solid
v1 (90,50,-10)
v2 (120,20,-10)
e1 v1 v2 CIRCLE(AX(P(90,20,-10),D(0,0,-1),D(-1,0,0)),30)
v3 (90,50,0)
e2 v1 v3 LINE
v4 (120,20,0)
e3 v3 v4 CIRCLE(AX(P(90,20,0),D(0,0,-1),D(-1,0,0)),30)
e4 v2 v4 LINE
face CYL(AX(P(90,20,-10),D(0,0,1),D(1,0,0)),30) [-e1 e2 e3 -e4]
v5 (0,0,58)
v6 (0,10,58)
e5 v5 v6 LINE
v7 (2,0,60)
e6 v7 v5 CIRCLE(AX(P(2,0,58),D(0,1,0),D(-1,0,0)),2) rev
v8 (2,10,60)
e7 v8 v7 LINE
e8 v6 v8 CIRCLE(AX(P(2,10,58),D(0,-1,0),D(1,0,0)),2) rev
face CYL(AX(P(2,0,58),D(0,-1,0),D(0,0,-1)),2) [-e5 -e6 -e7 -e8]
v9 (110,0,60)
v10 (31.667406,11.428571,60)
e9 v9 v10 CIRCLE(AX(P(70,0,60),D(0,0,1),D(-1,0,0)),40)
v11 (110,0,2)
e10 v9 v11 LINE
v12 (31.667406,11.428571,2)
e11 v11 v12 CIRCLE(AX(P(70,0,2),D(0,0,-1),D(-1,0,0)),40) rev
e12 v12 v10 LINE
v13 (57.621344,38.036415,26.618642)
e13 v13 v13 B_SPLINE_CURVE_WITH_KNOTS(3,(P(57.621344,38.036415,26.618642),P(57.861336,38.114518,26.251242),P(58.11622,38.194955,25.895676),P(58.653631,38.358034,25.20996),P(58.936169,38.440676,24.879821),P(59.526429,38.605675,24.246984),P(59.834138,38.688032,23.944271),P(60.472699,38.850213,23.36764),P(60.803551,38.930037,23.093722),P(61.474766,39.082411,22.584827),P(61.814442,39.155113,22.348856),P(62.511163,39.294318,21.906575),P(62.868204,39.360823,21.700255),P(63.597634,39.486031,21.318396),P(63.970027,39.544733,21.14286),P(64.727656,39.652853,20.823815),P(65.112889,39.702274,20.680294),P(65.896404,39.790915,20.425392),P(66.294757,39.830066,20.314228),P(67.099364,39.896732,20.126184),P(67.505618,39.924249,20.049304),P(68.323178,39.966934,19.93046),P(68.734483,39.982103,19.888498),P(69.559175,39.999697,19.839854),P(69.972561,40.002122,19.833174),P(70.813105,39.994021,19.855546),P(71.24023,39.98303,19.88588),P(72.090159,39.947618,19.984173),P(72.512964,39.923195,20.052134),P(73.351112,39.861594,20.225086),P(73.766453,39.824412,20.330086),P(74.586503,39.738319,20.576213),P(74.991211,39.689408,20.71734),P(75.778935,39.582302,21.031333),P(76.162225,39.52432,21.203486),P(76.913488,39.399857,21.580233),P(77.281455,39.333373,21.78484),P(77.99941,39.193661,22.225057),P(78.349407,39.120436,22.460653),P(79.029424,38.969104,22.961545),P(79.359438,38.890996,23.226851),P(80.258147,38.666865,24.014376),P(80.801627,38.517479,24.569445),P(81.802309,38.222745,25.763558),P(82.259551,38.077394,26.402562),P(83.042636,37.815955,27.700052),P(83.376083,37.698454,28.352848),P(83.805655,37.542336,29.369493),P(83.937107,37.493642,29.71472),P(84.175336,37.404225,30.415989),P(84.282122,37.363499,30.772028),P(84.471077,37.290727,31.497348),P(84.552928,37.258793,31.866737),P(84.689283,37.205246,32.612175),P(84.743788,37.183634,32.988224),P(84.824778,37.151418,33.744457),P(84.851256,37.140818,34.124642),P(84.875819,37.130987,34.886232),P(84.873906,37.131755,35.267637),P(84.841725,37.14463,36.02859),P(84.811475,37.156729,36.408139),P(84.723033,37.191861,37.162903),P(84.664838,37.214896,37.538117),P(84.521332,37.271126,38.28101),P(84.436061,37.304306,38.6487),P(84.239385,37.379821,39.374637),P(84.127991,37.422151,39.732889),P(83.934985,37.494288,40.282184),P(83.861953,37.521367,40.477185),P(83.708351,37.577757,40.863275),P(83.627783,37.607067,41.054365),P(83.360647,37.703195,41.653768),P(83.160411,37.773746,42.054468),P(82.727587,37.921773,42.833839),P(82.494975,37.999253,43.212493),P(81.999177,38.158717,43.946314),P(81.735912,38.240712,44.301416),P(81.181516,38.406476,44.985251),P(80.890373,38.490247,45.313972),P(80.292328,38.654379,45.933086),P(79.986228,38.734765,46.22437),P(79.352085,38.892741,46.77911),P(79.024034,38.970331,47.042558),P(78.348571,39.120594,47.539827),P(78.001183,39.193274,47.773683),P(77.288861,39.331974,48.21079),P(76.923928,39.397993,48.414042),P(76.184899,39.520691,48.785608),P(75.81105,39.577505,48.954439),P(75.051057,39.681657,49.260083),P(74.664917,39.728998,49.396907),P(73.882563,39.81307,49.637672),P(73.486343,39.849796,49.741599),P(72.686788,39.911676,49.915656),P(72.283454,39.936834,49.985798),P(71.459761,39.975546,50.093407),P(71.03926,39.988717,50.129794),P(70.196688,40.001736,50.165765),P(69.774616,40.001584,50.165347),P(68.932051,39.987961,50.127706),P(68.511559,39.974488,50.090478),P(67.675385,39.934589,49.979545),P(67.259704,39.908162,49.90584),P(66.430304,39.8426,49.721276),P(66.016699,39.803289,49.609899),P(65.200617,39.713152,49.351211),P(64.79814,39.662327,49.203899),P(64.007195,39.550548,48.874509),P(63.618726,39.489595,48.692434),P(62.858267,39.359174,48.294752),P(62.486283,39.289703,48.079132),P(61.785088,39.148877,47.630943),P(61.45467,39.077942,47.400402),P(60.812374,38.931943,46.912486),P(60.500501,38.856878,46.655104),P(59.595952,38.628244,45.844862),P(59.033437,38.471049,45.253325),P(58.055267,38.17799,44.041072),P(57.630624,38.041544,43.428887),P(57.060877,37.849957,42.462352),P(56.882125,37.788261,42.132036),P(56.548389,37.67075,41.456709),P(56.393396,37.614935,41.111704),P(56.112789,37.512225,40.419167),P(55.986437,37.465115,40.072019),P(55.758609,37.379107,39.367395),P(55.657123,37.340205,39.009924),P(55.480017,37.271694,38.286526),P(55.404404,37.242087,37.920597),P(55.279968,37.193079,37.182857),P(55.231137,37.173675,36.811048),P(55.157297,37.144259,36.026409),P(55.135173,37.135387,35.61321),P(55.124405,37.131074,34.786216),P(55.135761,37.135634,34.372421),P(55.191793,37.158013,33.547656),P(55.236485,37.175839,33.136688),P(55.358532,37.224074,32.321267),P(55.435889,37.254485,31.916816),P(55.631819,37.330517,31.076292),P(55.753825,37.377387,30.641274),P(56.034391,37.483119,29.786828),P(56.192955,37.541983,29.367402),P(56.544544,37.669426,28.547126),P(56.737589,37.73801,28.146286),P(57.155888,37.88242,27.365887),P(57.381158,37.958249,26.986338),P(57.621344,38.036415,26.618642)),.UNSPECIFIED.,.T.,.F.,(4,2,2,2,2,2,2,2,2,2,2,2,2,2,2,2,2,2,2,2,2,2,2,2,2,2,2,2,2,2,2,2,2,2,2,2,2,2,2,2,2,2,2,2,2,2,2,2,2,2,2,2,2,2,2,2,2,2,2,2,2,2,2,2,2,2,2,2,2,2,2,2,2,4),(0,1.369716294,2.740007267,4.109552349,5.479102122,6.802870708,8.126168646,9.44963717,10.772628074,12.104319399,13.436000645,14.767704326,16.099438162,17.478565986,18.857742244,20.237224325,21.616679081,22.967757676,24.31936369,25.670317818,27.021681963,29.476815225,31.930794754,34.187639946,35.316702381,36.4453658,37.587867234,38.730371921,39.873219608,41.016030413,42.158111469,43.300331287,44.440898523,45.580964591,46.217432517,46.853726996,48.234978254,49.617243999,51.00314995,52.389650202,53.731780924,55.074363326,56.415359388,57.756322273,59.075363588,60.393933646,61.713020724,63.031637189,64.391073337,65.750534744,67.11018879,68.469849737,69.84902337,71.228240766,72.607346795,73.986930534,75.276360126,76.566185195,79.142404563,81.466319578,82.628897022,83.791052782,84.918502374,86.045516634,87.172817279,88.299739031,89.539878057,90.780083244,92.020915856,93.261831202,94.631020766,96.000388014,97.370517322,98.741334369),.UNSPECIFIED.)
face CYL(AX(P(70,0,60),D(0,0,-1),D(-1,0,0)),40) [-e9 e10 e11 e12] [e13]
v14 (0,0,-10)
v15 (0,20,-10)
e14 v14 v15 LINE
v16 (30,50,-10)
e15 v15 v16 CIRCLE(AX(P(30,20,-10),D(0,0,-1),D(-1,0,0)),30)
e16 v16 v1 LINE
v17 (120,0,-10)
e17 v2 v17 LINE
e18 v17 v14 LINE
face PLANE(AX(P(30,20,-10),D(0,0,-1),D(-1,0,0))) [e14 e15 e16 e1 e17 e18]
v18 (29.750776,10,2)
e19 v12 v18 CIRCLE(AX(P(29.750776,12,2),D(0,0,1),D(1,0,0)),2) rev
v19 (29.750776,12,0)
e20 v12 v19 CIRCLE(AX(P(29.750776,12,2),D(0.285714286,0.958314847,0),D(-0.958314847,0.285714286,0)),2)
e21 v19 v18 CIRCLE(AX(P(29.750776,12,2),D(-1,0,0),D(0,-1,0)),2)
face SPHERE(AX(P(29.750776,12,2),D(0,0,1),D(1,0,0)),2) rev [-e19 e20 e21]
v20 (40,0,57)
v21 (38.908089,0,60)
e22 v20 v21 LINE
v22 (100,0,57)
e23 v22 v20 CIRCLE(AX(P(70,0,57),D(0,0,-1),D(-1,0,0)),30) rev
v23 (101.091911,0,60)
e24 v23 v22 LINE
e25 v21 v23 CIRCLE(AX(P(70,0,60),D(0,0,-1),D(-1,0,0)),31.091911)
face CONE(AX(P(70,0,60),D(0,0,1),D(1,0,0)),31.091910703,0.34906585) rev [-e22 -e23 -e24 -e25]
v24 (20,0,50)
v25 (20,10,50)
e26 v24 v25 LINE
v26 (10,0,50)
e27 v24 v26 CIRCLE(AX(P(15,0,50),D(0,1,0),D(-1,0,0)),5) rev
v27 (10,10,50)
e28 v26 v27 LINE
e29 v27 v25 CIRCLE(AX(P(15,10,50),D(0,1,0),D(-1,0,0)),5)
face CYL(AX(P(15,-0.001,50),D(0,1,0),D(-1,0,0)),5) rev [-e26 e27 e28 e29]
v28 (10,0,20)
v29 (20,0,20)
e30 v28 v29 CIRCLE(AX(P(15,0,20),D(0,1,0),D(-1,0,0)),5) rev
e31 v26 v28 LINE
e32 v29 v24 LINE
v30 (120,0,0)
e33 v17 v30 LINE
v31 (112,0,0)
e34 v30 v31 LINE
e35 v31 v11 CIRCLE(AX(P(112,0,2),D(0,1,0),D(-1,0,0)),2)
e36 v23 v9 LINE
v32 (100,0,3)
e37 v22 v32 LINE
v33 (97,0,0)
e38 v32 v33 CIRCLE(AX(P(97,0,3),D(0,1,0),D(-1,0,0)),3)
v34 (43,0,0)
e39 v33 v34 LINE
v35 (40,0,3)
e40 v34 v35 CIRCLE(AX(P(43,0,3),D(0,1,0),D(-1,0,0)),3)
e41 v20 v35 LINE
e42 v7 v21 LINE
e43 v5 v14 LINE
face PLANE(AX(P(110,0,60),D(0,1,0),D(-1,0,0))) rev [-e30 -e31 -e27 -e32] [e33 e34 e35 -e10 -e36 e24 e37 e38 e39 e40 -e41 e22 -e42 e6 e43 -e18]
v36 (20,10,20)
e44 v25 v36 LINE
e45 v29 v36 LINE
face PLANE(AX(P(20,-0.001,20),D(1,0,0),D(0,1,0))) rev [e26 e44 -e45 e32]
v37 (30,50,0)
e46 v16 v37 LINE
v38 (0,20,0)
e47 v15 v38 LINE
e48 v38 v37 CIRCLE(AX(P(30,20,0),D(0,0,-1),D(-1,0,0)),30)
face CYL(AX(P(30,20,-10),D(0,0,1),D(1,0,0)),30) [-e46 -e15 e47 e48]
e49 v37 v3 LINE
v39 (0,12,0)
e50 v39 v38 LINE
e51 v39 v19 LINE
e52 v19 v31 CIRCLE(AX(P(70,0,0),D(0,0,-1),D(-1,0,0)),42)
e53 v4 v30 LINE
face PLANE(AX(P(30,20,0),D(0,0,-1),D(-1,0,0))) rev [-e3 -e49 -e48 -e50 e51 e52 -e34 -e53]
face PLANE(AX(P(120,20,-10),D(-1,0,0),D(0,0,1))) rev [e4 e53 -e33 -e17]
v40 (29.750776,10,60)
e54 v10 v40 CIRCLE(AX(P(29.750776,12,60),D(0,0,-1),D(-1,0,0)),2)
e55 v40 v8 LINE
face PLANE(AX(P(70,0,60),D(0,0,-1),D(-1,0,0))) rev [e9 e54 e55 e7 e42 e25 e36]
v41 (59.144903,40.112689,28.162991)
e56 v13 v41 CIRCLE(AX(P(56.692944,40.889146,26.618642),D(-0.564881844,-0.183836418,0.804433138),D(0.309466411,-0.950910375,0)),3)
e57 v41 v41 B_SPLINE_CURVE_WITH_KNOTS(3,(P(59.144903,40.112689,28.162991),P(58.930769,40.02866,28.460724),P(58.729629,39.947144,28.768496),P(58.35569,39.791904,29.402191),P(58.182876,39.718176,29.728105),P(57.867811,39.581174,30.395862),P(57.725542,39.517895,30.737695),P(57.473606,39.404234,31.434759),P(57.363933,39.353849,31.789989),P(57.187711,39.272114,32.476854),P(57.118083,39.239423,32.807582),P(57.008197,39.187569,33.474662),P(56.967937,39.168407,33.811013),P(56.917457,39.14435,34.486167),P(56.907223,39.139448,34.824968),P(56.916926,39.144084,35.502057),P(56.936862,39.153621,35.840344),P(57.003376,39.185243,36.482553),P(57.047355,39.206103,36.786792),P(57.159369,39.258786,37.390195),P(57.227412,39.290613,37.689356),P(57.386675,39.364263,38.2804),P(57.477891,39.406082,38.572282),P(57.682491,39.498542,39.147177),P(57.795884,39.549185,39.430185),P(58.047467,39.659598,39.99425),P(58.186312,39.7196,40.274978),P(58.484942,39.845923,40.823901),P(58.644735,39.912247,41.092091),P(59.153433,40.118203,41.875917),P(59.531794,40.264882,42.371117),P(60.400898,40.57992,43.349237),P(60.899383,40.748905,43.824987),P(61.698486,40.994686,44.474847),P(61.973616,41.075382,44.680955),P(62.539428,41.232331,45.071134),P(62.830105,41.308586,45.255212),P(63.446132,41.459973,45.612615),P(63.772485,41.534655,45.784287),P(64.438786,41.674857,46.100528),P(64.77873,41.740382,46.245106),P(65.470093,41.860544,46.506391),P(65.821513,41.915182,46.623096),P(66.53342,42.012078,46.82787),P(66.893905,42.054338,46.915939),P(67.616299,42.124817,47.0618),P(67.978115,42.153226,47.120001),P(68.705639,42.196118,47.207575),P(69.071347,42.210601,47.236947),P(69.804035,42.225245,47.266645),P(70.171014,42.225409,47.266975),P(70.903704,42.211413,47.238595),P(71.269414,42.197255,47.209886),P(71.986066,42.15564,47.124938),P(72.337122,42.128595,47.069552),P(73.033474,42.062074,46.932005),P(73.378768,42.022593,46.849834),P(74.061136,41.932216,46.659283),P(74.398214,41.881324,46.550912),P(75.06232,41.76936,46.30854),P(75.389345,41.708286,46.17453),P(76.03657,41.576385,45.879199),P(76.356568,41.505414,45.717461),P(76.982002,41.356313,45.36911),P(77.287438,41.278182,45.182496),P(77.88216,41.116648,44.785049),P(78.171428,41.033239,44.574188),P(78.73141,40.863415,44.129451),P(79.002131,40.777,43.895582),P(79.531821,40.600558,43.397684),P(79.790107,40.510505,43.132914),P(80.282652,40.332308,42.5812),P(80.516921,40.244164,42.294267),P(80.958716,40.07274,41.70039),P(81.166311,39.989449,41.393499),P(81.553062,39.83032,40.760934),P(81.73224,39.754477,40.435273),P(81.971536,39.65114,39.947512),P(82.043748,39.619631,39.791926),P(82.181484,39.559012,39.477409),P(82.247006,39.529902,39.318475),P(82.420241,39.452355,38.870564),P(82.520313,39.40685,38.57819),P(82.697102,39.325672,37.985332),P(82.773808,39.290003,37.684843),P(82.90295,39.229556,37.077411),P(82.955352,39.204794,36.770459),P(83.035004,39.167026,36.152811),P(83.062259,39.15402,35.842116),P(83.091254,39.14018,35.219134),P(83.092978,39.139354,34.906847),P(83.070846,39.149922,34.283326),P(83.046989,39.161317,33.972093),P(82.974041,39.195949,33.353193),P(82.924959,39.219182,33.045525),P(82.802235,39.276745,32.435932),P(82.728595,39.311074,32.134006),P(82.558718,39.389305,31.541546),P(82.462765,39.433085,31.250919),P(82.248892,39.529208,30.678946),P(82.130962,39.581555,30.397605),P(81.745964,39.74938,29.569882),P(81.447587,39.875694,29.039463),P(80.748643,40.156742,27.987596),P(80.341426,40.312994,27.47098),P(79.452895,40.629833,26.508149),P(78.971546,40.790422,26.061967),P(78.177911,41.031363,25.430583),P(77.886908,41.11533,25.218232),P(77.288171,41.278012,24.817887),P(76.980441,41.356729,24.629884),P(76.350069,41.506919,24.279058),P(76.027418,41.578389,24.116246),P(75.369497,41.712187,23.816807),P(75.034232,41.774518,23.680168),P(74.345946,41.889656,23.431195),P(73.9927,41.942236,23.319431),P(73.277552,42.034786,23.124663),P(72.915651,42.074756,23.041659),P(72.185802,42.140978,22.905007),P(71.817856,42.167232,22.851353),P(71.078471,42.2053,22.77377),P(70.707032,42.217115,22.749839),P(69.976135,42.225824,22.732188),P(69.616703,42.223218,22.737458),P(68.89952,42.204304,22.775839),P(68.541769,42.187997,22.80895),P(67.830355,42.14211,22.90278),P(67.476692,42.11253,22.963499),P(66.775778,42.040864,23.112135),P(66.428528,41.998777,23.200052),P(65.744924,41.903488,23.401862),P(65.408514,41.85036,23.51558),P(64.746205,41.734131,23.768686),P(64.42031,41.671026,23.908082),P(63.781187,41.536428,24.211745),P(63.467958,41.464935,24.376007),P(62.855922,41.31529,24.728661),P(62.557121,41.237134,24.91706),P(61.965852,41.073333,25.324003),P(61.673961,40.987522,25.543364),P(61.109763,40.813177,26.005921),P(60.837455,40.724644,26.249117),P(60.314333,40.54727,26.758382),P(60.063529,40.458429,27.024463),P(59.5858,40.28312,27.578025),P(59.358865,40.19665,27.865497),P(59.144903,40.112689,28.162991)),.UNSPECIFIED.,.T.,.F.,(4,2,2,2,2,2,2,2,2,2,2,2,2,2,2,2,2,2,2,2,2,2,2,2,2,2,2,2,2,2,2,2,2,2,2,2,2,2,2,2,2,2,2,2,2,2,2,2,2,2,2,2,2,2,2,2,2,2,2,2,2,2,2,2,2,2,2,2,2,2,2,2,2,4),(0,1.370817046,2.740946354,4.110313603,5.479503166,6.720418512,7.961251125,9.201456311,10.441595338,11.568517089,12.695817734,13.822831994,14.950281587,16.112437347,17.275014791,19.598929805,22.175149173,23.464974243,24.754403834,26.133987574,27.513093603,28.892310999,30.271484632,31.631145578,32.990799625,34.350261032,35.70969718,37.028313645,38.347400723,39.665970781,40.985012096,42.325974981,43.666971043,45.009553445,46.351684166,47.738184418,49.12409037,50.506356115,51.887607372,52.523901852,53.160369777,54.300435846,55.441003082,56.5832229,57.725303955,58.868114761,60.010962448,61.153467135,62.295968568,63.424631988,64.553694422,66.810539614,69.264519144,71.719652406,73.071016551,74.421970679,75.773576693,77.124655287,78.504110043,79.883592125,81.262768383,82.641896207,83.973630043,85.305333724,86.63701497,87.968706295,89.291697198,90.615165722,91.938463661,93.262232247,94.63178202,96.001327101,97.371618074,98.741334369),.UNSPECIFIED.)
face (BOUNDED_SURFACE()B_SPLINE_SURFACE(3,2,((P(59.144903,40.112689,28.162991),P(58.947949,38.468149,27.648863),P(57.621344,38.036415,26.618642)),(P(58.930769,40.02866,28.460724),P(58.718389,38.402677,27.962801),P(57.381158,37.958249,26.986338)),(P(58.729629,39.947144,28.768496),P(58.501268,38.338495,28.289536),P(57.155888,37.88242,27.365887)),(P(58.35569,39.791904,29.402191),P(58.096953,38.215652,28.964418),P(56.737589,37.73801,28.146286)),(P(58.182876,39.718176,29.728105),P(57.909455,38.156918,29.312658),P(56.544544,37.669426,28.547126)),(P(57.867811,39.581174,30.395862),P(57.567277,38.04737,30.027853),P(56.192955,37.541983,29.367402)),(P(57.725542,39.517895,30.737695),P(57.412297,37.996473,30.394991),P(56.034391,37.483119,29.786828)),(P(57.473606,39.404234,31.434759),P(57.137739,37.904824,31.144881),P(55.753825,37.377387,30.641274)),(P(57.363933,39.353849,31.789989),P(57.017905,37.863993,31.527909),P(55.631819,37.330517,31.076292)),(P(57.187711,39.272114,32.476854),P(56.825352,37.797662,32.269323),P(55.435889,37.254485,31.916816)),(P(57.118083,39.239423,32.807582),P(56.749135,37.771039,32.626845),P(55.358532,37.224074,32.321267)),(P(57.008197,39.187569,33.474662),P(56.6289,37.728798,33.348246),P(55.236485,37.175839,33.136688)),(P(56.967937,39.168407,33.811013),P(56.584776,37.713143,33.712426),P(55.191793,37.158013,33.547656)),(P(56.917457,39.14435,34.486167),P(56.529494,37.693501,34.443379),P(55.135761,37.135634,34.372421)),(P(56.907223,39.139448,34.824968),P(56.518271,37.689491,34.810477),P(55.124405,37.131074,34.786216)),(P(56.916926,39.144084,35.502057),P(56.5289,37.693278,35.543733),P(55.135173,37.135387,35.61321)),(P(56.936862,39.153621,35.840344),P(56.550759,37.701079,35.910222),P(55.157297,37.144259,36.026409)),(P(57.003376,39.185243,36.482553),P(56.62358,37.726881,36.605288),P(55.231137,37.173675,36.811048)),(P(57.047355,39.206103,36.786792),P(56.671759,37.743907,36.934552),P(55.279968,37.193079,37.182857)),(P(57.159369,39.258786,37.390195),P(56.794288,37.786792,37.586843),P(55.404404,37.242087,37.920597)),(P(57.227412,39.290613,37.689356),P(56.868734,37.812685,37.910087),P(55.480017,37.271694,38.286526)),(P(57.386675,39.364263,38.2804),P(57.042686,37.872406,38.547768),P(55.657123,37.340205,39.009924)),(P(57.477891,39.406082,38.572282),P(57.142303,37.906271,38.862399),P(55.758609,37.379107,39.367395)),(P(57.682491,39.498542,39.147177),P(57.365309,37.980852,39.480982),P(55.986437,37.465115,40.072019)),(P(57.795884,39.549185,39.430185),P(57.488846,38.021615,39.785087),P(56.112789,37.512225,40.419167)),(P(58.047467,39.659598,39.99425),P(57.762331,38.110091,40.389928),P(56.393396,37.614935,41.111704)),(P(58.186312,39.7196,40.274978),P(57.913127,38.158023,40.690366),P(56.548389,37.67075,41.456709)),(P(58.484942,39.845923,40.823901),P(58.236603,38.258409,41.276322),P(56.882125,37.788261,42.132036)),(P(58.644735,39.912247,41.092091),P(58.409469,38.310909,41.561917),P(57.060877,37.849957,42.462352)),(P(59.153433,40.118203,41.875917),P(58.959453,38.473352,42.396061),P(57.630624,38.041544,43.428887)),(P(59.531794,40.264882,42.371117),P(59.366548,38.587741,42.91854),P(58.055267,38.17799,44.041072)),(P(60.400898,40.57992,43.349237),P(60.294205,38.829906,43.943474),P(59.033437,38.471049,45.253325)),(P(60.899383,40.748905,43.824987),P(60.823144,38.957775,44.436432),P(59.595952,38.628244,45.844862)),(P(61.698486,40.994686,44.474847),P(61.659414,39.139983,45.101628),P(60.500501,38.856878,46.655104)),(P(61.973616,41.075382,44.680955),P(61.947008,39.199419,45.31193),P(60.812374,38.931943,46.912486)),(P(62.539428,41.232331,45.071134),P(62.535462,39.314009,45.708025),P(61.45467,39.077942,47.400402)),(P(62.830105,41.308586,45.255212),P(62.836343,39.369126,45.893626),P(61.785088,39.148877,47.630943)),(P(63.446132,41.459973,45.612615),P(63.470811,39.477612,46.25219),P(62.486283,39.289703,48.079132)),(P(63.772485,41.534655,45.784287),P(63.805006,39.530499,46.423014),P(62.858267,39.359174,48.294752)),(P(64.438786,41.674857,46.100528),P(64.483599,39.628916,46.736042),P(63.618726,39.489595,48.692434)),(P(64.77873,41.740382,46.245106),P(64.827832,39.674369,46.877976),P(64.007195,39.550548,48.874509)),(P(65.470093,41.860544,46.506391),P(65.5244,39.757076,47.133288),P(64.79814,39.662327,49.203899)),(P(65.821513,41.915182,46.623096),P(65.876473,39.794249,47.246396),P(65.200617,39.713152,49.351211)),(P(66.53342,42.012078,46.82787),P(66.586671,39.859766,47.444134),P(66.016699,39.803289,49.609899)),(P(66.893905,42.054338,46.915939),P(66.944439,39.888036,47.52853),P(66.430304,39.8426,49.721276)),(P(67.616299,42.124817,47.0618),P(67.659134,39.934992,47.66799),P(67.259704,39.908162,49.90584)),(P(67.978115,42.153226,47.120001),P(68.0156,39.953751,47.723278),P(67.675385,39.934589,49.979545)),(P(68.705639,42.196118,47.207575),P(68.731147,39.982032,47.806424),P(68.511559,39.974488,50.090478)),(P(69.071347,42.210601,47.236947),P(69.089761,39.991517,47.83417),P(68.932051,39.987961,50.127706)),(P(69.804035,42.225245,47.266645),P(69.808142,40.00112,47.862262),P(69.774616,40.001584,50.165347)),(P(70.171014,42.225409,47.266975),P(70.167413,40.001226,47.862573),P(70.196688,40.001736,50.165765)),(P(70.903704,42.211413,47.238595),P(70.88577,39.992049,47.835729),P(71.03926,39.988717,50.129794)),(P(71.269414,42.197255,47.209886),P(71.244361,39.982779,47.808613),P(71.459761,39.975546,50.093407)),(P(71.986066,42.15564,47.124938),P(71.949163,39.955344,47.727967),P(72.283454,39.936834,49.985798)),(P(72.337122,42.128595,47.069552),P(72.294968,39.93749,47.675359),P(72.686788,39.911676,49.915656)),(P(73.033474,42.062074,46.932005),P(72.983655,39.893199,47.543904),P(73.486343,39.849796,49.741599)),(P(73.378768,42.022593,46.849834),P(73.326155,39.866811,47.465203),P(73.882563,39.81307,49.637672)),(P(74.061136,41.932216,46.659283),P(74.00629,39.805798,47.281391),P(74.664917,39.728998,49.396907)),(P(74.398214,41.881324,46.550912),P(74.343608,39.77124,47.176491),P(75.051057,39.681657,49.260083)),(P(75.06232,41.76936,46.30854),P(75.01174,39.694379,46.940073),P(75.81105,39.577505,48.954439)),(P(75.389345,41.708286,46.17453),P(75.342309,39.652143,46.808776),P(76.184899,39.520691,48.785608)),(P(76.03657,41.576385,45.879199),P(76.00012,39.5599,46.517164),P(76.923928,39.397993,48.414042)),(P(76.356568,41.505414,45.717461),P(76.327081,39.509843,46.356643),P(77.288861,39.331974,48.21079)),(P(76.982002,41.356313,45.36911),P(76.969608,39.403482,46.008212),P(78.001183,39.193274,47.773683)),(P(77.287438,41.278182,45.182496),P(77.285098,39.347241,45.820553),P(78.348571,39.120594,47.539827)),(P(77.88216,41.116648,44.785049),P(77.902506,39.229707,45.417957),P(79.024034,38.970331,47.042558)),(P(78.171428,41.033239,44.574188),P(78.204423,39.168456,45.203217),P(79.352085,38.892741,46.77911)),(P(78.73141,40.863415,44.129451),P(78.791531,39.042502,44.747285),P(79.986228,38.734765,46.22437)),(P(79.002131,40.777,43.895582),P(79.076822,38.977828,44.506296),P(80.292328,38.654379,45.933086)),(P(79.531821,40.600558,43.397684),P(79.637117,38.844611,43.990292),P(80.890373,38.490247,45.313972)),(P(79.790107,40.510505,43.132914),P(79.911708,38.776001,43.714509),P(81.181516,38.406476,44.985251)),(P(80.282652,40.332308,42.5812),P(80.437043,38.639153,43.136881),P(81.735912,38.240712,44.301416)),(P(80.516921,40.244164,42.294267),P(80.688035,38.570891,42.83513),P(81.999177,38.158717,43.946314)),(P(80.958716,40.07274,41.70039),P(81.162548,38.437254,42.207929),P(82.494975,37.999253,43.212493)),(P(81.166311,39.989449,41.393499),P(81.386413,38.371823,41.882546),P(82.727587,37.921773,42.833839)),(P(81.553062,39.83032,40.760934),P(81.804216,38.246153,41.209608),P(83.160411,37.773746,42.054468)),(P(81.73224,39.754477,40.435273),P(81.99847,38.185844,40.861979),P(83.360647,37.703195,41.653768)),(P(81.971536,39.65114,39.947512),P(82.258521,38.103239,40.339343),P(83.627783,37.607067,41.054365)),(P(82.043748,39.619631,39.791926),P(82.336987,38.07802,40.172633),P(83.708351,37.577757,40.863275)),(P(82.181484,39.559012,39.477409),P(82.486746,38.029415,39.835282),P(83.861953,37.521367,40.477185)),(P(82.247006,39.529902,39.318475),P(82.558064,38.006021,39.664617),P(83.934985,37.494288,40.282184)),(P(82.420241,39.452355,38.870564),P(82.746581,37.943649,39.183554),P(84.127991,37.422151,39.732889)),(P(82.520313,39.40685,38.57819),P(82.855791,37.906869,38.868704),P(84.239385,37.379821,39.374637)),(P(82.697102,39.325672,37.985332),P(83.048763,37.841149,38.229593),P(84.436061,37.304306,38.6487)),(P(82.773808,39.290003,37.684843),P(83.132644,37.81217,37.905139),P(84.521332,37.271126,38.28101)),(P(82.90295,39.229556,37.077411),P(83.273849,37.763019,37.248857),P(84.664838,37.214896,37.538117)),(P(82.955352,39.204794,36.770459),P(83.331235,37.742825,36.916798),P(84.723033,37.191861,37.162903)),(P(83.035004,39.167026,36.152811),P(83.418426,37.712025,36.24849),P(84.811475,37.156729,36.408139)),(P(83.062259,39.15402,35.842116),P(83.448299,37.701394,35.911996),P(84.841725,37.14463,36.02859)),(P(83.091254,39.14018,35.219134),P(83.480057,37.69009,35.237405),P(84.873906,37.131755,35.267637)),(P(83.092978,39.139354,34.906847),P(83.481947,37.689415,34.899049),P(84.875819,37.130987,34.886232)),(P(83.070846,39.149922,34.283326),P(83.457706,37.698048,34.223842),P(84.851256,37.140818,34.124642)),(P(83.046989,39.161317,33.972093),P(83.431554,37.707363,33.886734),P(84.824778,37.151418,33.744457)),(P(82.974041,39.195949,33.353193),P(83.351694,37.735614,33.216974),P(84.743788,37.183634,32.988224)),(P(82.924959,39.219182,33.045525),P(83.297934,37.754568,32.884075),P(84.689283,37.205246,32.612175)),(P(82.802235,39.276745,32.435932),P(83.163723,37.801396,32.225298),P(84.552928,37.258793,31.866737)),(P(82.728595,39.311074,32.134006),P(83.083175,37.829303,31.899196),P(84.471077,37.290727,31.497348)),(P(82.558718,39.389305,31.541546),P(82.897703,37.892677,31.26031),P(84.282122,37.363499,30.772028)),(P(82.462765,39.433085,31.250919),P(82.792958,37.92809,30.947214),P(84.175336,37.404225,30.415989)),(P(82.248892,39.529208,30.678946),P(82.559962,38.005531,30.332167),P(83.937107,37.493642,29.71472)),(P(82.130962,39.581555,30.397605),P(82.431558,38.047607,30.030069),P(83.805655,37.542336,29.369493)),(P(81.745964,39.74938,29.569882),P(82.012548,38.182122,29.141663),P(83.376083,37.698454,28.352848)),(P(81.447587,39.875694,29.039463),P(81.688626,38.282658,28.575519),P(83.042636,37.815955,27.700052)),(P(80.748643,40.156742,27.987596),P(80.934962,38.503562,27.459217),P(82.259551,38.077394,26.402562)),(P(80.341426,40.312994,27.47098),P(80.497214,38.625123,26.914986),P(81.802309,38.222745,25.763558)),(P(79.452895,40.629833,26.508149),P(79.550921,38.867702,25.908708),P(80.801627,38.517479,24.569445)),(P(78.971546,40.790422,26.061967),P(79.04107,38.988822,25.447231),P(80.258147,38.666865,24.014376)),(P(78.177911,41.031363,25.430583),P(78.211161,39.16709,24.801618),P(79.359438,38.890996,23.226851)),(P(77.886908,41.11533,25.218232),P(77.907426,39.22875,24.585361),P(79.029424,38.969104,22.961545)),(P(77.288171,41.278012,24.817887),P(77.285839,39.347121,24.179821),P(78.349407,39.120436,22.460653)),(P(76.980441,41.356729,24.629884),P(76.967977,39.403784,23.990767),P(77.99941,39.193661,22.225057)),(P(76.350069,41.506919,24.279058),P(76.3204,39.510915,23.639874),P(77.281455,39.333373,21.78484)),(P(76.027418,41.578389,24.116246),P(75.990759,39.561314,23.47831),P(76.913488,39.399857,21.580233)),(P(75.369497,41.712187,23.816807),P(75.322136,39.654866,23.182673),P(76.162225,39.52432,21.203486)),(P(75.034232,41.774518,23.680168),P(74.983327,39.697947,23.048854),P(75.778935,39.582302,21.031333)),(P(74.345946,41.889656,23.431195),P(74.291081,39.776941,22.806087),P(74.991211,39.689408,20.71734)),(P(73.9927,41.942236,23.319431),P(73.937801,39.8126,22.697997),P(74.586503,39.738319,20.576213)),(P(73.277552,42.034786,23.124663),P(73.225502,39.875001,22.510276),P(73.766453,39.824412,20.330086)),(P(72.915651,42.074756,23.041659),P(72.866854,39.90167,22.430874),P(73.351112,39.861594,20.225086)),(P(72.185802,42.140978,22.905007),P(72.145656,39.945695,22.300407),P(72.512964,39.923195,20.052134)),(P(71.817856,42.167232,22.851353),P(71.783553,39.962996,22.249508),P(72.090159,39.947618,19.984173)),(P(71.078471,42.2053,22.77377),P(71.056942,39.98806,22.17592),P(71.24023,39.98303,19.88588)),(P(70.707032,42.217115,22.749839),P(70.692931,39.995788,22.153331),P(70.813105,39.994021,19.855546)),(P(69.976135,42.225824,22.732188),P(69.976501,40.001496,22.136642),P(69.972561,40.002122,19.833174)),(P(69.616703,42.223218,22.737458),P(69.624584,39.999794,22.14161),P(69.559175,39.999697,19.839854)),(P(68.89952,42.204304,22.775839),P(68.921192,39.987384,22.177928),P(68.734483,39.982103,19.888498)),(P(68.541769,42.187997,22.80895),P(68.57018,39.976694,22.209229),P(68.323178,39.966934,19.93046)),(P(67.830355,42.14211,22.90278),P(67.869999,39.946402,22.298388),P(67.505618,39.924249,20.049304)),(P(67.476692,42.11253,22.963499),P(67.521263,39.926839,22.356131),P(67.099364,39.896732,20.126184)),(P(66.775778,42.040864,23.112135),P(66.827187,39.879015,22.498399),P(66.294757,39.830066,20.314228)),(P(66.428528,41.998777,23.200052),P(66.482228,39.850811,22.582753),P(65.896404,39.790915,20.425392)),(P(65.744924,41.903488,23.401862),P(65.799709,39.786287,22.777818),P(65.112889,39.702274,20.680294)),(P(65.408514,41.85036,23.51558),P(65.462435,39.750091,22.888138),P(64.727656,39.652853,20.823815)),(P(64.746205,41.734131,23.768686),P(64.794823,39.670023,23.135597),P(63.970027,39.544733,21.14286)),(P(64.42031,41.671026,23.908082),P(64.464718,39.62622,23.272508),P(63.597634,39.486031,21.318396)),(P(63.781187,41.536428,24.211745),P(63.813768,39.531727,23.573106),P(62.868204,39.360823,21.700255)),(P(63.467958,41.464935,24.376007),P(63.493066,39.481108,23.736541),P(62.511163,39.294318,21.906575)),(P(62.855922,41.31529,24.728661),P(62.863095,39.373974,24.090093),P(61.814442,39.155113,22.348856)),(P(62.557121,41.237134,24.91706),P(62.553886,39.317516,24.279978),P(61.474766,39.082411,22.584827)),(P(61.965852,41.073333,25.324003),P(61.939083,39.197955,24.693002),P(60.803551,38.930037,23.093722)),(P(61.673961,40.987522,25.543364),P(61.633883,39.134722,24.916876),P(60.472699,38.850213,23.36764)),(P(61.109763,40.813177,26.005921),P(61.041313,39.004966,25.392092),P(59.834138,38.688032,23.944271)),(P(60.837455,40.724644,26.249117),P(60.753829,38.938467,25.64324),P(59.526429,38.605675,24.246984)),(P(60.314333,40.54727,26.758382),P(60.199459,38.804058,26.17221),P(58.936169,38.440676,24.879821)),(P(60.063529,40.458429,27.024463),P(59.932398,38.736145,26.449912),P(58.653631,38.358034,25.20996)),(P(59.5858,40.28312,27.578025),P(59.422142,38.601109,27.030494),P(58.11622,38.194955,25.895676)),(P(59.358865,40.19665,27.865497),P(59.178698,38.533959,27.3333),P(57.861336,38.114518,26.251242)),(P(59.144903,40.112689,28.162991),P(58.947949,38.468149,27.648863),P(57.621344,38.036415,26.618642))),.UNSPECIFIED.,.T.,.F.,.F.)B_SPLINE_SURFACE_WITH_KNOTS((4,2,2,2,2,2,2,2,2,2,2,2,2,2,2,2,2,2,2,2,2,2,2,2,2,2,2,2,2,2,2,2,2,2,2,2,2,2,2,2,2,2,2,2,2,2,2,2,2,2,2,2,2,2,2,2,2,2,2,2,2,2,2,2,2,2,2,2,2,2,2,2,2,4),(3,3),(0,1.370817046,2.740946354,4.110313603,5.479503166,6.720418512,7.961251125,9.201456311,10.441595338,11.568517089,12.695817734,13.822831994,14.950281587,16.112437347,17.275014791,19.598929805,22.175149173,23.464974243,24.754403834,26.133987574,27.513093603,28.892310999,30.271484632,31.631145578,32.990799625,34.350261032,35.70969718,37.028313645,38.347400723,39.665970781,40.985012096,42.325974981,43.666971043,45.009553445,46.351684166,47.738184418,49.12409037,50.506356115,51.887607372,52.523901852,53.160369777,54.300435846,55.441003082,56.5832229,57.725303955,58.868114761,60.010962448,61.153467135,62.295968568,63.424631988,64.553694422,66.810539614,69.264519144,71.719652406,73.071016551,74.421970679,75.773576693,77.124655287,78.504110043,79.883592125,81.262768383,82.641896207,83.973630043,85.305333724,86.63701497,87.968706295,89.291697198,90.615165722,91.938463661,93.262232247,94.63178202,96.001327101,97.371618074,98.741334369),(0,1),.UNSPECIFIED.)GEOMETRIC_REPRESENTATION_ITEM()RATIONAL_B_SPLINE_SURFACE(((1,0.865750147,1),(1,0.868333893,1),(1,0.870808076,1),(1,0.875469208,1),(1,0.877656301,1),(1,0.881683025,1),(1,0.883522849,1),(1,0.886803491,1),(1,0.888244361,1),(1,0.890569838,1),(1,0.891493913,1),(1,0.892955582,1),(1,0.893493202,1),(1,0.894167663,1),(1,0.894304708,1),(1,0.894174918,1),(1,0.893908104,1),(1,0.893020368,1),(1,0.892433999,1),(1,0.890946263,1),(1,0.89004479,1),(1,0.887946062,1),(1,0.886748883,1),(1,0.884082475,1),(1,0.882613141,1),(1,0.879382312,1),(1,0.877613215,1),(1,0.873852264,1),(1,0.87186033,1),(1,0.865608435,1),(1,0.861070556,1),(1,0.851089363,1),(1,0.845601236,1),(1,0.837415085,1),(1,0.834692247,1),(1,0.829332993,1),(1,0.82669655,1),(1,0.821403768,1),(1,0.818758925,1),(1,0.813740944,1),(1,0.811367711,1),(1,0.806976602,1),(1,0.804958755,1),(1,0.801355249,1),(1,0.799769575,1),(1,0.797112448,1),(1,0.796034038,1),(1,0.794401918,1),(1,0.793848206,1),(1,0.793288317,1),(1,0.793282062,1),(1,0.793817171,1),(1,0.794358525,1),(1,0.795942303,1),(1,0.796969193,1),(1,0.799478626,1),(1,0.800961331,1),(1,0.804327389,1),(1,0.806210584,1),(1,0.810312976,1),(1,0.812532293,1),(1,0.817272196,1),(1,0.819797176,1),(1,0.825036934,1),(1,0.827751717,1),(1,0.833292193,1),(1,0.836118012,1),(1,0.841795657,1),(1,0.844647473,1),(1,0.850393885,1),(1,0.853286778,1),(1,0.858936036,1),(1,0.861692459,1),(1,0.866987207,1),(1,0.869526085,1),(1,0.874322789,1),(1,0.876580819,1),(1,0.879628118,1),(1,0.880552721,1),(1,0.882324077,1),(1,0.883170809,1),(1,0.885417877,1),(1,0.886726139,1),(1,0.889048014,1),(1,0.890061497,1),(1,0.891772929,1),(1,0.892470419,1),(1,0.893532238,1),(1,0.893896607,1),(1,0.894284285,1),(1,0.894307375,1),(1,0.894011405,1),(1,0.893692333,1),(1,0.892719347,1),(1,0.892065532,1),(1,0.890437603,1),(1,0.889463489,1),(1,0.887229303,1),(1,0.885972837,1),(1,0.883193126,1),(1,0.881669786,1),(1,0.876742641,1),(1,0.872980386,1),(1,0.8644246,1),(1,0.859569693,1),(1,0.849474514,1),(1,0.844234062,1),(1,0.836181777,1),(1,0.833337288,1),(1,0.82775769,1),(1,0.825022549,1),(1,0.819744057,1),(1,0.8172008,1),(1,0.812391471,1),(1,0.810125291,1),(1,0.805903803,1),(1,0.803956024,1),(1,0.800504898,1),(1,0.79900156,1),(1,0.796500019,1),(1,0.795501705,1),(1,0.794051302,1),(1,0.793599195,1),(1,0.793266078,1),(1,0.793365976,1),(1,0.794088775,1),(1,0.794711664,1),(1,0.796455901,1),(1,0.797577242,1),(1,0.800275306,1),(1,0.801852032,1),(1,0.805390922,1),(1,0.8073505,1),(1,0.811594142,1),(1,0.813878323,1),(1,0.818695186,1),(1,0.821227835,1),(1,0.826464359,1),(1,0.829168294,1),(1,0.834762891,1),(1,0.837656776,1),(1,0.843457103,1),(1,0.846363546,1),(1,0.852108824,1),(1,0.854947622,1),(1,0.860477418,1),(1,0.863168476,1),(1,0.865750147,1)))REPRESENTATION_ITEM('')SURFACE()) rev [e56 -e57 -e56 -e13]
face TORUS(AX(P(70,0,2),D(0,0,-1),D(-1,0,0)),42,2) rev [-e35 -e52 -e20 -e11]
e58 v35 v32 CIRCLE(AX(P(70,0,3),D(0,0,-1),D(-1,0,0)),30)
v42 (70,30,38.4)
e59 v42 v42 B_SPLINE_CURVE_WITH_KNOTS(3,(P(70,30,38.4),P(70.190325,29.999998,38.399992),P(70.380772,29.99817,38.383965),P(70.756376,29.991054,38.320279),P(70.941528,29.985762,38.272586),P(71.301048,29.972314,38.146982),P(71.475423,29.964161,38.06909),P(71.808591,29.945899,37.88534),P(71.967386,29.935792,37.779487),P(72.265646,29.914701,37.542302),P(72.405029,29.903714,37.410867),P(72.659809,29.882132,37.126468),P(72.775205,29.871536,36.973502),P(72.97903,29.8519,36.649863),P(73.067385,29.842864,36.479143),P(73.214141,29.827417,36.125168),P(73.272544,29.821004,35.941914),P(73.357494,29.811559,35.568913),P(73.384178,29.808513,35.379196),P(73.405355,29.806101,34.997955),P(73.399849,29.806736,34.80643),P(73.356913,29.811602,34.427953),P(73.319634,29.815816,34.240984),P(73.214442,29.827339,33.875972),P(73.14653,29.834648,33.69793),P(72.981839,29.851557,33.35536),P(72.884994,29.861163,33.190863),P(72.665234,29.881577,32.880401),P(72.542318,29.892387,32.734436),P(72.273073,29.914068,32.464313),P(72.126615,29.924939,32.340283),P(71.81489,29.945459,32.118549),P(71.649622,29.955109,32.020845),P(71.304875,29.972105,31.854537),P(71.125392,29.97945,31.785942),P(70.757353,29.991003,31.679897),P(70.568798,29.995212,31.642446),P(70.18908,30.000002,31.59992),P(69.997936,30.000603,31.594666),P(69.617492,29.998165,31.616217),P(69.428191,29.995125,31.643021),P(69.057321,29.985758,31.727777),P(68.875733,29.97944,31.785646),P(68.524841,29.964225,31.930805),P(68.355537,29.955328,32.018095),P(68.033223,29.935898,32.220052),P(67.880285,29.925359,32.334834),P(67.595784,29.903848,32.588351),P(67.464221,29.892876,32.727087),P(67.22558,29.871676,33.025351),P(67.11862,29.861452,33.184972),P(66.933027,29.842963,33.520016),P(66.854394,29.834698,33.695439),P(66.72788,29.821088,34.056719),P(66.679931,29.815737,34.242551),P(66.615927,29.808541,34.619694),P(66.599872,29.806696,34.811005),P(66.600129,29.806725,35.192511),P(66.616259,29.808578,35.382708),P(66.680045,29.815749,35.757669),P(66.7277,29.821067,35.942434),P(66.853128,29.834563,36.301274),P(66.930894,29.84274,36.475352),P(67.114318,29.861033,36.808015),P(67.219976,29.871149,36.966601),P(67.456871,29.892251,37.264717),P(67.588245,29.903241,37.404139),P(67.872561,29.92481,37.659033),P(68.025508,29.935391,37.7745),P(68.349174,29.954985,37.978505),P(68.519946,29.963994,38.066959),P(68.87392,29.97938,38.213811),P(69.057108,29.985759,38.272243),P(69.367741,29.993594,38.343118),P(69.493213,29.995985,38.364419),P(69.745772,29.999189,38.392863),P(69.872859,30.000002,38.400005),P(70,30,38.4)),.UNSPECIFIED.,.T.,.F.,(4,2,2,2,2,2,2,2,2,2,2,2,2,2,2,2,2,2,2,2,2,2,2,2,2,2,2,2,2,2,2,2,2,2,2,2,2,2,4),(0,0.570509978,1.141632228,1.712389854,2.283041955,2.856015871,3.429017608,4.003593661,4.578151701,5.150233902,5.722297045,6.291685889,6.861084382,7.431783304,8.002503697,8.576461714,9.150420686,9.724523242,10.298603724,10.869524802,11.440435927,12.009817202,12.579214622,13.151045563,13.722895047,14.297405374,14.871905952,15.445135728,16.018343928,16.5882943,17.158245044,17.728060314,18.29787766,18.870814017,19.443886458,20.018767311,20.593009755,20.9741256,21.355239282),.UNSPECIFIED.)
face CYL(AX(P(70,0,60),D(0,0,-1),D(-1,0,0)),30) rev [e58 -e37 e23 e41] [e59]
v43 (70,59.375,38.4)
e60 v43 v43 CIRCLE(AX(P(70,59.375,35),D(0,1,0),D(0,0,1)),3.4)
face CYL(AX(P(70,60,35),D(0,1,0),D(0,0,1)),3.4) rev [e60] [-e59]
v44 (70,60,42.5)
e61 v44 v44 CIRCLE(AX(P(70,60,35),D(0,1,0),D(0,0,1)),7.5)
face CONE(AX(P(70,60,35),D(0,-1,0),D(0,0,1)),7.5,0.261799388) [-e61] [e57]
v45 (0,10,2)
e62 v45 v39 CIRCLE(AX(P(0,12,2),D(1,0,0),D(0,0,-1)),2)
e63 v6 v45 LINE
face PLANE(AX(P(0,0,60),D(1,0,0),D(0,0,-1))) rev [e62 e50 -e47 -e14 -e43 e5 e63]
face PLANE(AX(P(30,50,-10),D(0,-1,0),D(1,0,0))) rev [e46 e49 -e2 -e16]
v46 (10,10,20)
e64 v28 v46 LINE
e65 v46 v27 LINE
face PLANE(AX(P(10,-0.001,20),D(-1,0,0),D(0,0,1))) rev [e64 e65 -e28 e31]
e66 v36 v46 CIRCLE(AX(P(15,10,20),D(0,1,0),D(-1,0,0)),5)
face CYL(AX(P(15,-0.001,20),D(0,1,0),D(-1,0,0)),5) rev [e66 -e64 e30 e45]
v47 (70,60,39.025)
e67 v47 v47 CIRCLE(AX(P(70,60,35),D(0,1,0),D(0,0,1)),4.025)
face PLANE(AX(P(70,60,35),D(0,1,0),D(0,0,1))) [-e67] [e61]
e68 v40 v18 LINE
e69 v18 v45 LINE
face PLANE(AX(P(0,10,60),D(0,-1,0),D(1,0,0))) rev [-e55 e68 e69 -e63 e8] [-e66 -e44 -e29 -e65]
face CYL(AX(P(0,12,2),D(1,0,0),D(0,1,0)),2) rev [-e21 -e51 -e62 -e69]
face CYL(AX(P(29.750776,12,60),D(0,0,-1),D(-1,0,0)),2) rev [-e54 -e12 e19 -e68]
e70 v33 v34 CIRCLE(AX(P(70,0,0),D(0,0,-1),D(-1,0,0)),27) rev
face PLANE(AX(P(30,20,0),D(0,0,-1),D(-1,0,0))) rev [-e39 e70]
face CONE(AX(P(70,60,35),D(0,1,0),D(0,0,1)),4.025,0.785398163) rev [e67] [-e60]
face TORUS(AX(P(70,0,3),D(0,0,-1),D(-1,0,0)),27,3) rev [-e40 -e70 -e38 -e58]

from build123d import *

# Parameters (mm, degrees)
P_IDAT_VYSUNUT_M1_DEPTH  = 60
ODEBRAT_VYSUNUT_M1_REACH = 130.841
P_IDAT_VYSUNUT_M2_DEPTH  = 10
M8_Z_VIT1_D              = 6.8
M8_Z_VIT1_CSINK_D        = 8.05
M8_Z_VIT1_CSINK_ANGLE    = 90
ZAOBLIT1_R               = 2
ZAOBLIT2_R               = 3
ZKOSEN_1_SIZE            = 3
ZKOSEN_1_SIZE2           = 1.091910703


# Read off the part's stored shape, not the designer's step: Přidat vysunutím3
with BuildPart() as part:
    # Skica1 → Přidat vysunutím1 (new body)
    with BuildSketch(Plane.XY):
        with BuildLine():
            Line((0, 0), (0, 10))
            Line((0, 10), (31.270166538, 10))
            ThreePointArc((31.270166538, 10), (75.040171699, 39.681187851), (110, 0))
            Line((110, 0), (100, 0))
            ThreePointArc((100, 0), (70, 30), (40, 0))
            Line((40, 0), (0, 0))
        make_face()
    extrude(amount=P_IDAT_VYSUNUT_M1_DEPTH)

    # Skica2 → Odebrat vysunutím1 (cut, up to next)
    with BuildSketch(Plane(origin=(0, 10, 0), x_dir=(1, 0, 0), z_dir=(0, 1, 0)), mode=Mode.PRIVATE) as odebrat_vysunut_m1_sk1:
        with BuildLine():
            Line((20, -20), (20, -50))
            ThreePointArc((20, -50), (15, -55), (10, -50))
            Line((10, -50), (10, -20))
            ThreePointArc((10, -20), (15, -15), (20, -20))
        make_face()
    odebrat_vysunut_m1_tool1 = extrude(odebrat_vysunut_m1_sk1.sketch, amount=-ODEBRAT_VYSUNUT_M1_REACH, mode=Mode.PRIVATE) & part.part
    add(odebrat_vysunut_m1_tool1.solids().sort_by_distance((15, 10, 35))[0], mode=Mode.SUBTRACT)

    # Skica3 → Přidat vysunutím2 (add)
    with BuildSketch(Plane(origin=(0, 0, 0), x_dir=(-1, 0, 0), z_dir=(0, 0, -1))):
        with BuildLine():
            Line((0, 0), (0, 20))
            ThreePointArc((0, 20), (-8.786796564, 41.213203436), (-30, 50))
            Line((-30, 50), (-90, 50))
            ThreePointArc((-90, 50), (-111.213203436, 41.213203436), (-120, 20))
            Line((-120, 20), (-120, 0))
            Line((-120, 0), (0, 0))
        make_face()
    extrude(amount=P_IDAT_VYSUNUT_M2_DEPTH)

    # Přidat vysunutím3 outline → Přidat vysunutím3 (revolve)
    with BuildSketch(Plane(origin=(70, 0, 35), x_dir=(1, 0, 0), z_dir=(0, 0, 1))):
        Polygon((7.5, 60), (0, 60), (0, 37.657552573), (13.486640745, 37.657552573), align=None)
    revolve(axis=Axis((70, 0, 35), (0, 1, 0)))

    # M8 závit1 (through all)
    with Locations(Plane(origin=(0, 60, 0), x_dir=(1, 0, 0), z_dir=(0, 1, 0))):
        with Locations((70, -35)):
            CounterSinkHole(M8_Z_VIT1_D / 2, M8_Z_VIT1_CSINK_D / 2, counter_sink_angle=M8_Z_VIT1_CSINK_ANGLE)

    # Zaoblit1
    zaoblit1_edges = [part.edges().sort_by_distance(p)[0] for p in [
        (31.270166538, 10, 30),
        (0, 5, 60),
        (15.635083269, 10, 0),
        (75.040171699, 39.681187851, 0),
    ]]
    fillet(zaoblit1_edges, radius=ZAOBLIT1_R)

    # Zaoblit2
    zaoblit2_edges = [part.edges().sort_by_distance(p)[0] for p in [
        (56.513435034, 37.657835378, 35.000000009),
        (70, 30, 0),
    ]]
    fillet(zaoblit2_edges, radius=ZAOBLIT2_R)

    # Zkosení1
    zkosen_1_edges = [part.edges().sort_by_distance(p)[0] for p in [
        (70, 30, 60),
    ]]
    zkosen_1_side = [part.faces().sort_by_distance(p)[0] for p in [
        (70, 30, 31.5),
    ]]
    chamfer(zkosen_1_edges, length=ZKOSEN_1_SIZE, length2=ZKOSEN_1_SIZE2, reference=zkosen_1_side[0])


solid = part.part
